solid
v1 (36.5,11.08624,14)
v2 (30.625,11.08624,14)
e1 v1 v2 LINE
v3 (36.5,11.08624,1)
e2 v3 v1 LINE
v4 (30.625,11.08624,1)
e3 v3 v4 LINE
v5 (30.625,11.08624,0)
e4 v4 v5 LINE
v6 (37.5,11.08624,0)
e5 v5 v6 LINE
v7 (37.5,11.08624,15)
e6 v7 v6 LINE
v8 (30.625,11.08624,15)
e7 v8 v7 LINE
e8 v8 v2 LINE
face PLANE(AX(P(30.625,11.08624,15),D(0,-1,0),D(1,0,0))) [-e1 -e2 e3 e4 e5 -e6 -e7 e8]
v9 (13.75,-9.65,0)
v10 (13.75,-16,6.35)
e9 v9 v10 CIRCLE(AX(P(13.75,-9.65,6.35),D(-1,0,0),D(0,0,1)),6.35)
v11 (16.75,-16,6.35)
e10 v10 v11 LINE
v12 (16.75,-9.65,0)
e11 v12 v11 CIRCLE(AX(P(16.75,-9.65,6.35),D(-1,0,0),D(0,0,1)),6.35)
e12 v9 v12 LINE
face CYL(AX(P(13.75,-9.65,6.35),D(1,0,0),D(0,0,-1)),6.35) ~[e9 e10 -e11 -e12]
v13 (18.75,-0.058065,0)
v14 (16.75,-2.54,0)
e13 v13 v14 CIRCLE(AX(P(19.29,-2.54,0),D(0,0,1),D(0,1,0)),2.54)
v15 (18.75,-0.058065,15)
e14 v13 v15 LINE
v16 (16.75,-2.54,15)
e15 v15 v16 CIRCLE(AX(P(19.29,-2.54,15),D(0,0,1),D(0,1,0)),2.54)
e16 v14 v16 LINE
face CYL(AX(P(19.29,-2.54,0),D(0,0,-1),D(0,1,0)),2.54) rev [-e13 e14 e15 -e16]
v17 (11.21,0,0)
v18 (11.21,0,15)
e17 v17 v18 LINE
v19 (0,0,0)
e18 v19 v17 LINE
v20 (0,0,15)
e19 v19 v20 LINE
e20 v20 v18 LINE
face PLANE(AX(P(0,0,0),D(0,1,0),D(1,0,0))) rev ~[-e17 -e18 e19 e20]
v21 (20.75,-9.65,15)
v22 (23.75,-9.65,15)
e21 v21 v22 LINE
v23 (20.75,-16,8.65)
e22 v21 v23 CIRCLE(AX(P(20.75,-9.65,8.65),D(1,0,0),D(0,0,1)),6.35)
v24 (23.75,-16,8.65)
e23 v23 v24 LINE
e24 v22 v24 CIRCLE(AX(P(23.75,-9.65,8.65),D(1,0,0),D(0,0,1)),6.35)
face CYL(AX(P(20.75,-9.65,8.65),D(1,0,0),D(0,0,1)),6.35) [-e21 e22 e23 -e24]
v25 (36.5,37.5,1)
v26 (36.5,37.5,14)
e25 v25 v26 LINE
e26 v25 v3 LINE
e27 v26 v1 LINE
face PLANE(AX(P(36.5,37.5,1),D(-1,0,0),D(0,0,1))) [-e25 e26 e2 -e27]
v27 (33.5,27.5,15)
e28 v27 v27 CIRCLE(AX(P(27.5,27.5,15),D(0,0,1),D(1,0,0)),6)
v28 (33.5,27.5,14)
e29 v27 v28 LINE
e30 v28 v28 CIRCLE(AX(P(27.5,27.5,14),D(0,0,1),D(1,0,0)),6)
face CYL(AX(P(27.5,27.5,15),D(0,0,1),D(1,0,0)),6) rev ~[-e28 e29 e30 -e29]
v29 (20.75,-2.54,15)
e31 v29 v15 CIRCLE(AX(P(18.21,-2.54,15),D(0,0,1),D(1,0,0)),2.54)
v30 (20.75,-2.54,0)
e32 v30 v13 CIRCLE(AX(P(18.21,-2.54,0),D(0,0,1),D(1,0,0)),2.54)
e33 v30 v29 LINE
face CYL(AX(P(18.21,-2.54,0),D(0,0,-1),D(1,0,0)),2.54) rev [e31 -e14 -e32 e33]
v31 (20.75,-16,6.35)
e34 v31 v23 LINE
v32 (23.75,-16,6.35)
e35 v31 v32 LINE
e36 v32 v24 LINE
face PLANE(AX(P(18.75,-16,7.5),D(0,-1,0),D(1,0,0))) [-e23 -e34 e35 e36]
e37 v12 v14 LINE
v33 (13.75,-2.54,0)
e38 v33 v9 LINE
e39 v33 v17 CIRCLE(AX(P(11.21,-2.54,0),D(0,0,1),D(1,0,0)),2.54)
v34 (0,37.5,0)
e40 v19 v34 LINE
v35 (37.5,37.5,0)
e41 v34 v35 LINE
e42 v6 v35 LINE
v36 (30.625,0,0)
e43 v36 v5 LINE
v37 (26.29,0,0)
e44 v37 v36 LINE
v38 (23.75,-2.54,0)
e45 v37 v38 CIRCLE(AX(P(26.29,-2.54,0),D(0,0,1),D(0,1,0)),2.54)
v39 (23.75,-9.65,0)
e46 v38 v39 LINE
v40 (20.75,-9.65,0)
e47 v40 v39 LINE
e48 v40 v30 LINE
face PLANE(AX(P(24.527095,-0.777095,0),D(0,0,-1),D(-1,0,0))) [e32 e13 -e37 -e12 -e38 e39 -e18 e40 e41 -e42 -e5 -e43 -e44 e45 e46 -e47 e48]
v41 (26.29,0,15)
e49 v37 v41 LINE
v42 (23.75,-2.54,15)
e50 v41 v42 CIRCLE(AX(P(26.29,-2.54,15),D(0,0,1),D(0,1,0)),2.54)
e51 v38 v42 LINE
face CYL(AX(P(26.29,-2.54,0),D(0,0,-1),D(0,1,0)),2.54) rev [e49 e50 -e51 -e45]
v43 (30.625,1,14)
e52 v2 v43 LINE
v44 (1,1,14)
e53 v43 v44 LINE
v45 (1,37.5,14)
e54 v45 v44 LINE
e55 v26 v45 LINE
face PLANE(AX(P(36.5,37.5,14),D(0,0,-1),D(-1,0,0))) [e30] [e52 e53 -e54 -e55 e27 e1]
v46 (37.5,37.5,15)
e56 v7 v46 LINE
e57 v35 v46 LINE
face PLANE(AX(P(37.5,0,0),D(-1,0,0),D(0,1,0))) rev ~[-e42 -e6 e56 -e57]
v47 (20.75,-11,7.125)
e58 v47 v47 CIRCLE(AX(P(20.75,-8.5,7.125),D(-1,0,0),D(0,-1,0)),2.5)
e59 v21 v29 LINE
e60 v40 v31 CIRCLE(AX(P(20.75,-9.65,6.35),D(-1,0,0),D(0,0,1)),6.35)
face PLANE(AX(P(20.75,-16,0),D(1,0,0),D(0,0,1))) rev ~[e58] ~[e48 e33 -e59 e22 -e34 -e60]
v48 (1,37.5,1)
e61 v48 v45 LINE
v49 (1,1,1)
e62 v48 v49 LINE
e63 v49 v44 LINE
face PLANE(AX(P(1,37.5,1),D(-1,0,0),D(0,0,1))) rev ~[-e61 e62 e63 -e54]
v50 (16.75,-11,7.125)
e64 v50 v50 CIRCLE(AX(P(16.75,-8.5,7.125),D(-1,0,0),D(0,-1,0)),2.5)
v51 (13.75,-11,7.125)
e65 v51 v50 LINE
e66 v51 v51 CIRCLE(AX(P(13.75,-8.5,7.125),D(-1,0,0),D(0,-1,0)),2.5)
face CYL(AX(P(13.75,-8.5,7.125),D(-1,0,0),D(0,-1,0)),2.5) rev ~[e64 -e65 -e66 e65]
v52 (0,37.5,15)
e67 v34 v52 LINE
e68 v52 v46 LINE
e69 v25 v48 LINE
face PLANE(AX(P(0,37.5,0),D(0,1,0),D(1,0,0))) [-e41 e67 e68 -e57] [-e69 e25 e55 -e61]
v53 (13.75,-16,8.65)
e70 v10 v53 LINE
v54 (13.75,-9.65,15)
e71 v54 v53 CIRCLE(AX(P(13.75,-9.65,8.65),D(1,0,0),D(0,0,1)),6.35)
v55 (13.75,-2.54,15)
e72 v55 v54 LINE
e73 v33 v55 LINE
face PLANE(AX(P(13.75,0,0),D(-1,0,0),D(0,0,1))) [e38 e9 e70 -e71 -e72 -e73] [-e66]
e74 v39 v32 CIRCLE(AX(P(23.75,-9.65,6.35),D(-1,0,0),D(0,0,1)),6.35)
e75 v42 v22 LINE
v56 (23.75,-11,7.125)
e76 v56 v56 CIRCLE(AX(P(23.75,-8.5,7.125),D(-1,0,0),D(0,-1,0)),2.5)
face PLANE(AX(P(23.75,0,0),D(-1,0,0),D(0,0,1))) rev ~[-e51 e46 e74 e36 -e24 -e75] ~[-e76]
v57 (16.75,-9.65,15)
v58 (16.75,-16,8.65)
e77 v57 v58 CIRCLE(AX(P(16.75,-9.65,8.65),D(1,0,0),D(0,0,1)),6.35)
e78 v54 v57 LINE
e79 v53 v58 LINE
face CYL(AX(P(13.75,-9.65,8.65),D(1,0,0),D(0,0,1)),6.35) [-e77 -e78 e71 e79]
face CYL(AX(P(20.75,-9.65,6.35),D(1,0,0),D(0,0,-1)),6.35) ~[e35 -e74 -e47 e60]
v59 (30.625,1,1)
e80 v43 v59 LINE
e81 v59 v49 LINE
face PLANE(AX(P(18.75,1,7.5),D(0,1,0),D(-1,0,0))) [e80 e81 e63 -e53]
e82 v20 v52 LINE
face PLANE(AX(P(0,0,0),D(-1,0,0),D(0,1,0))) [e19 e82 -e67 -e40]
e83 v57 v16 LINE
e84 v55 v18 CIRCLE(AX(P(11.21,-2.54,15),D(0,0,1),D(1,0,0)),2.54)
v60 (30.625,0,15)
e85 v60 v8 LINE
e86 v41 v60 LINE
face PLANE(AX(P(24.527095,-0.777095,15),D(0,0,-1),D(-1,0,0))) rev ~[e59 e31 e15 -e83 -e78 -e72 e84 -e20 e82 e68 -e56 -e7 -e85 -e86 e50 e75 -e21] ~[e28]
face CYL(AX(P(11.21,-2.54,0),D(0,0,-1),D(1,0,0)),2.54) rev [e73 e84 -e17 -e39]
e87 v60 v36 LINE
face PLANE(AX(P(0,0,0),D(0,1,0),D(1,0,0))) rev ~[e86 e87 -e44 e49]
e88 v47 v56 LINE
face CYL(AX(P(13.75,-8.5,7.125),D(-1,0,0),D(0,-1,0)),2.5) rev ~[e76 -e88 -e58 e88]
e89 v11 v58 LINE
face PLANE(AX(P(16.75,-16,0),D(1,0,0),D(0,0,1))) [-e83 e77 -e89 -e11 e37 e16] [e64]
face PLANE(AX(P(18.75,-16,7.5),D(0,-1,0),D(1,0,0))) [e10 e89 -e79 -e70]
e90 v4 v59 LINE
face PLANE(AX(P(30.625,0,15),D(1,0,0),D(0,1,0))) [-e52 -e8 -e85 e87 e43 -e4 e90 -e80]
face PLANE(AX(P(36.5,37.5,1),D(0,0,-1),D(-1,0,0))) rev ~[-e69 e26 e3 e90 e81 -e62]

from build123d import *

# Parameters (mm, degrees)
F0_W         = 37.5
F0_H         = 37.5
F1_DEPTH     = 15
F2_W         = 35.5
F2_H         = 13
F3_DEPTH     = 36.5
F4_R         = 6
F5_DEPTH     = 1
F6_W         = 10
F6_H         = 15
F7_DEPTH     = 16
F8_R         = 2.5
F9_DEPTH     = 25.4
F10_W        = 4
F10_H        = 15
F11_DEPTH    = 16
F12_R        = 6.35
F13_W        = 6.875
F13_H        = 11.0862404108
F14_DEPTH    = 25.4
F15_T1_DEPTH = 15


# Not quite as in the source:
# - a fillet or chamfer that OpenCascade refuses, or shapes differently, is made with other operations: its cross-section is extruded or revolved along the edge and cut away or added


with BuildPart() as f1:
    # F0 (on Top) → F1 (new body)
    with BuildSketch(Plane.XY):
        with Locations((18.75, 18.75)):
            Rectangle(F0_W, F0_H)
    extrude(amount=F1_DEPTH)

    # F2 (on face) → F3 (cut)
    with BuildSketch(Plane(origin=(0, 37.5, 0), x_dir=(-1, 0, 0), z_dir=(0, 1, 0))):
        with Locations((-18.75, 7.5)):
            Rectangle(F2_W, F2_H)
    extrude(amount=-F3_DEPTH, mode=Mode.SUBTRACT)

    # F4 (on face) → F5 (cut, through all)
    with BuildSketch(Plane.XY.offset(15)):
        with Locations((27.5, 27.5)):
            Circle(F4_R)
    extrude(amount=-F5_DEPTH, mode=Mode.SUBTRACT)

    # F6 (on face) → F7 (join)
    with BuildSketch(Plane.XZ):
        with Locations((18.75, 7.5)):
            Rectangle(F6_W, F6_H)
    extrude(amount=F7_DEPTH)

    # F8 (on face) → F9 (cut)
    with BuildSketch(Plane(origin=(13.75, 0, 0), x_dir=(0, -1, 0), z_dir=(-1, 0, 0))):
        with Locations((8.5, 7.125)):
            Circle(F8_R)
    extrude(amount=-F9_DEPTH, mode=Mode.SUBTRACT)

    # F10 (on face) → F11 (cut)
    with BuildSketch(Plane.XZ.offset(16)):
        with Locations((18.75, 7.5)):
            Rectangle(F10_W, F10_H)
    extrude(amount=-F11_DEPTH, mode=Mode.SUBTRACT)

    # F12
    f12_edges = [f1.edges().sort_by_distance(p)[0] for p in [
        (15.25, -16, 15),
        (22.25, -16, 15),
        (22.25, -16, 0),
        (15.25, -16, 0),
    ]]
    fillet(f12_edges, radius=F12_R)

    # F13 (on face) → F14 (cut)
    with BuildSketch(Plane.XY.offset(15)):
        with Locations((34.0625, 5.5431202054)):
            Rectangle(F13_W, F13_H)
    extrude(amount=-F14_DEPTH, mode=Mode.SUBTRACT)

    # F15: fillet of radius 2.54 on 4 edges, made by hand

    # F15_s2 → F15_t1 (join)
    with BuildSketch(Plane.XY):
        with BuildLine():
            ThreePointArc((26.29, 0), (24.4939487758, -0.7439487758), (23.75, -2.54))
            Line((23.75, -2.54), (23.75, 0))
            Line((23.75, 0), (26.29, 0))
        make_face()
        with BuildLine():
            ThreePointArc((20.75, -2.54), (20.0060512242, -0.7439487758), (18.21, 0))
            Line((18.21, 0), (20.75, 0))
            Line((20.75, 0), (20.75, -2.54))
        make_face()
        with BuildLine():
            ThreePointArc((13.75, -2.54), (13.0060512242, -0.7439487758), (11.21, 0))
            Line((11.21, 0), (13.75, 0))
            Line((13.75, 0), (13.75, -2.54))
        make_face()
        with BuildLine():
            ThreePointArc((19.29, 0), (17.4939487758, -0.7439487758), (16.75, -2.54))
            Line((16.75, -2.54), (16.75, 0))
            Line((16.75, 0), (19.29, 0))
        make_face()
    extrude(amount=F15_T1_DEPTH)


solid = f1.part
